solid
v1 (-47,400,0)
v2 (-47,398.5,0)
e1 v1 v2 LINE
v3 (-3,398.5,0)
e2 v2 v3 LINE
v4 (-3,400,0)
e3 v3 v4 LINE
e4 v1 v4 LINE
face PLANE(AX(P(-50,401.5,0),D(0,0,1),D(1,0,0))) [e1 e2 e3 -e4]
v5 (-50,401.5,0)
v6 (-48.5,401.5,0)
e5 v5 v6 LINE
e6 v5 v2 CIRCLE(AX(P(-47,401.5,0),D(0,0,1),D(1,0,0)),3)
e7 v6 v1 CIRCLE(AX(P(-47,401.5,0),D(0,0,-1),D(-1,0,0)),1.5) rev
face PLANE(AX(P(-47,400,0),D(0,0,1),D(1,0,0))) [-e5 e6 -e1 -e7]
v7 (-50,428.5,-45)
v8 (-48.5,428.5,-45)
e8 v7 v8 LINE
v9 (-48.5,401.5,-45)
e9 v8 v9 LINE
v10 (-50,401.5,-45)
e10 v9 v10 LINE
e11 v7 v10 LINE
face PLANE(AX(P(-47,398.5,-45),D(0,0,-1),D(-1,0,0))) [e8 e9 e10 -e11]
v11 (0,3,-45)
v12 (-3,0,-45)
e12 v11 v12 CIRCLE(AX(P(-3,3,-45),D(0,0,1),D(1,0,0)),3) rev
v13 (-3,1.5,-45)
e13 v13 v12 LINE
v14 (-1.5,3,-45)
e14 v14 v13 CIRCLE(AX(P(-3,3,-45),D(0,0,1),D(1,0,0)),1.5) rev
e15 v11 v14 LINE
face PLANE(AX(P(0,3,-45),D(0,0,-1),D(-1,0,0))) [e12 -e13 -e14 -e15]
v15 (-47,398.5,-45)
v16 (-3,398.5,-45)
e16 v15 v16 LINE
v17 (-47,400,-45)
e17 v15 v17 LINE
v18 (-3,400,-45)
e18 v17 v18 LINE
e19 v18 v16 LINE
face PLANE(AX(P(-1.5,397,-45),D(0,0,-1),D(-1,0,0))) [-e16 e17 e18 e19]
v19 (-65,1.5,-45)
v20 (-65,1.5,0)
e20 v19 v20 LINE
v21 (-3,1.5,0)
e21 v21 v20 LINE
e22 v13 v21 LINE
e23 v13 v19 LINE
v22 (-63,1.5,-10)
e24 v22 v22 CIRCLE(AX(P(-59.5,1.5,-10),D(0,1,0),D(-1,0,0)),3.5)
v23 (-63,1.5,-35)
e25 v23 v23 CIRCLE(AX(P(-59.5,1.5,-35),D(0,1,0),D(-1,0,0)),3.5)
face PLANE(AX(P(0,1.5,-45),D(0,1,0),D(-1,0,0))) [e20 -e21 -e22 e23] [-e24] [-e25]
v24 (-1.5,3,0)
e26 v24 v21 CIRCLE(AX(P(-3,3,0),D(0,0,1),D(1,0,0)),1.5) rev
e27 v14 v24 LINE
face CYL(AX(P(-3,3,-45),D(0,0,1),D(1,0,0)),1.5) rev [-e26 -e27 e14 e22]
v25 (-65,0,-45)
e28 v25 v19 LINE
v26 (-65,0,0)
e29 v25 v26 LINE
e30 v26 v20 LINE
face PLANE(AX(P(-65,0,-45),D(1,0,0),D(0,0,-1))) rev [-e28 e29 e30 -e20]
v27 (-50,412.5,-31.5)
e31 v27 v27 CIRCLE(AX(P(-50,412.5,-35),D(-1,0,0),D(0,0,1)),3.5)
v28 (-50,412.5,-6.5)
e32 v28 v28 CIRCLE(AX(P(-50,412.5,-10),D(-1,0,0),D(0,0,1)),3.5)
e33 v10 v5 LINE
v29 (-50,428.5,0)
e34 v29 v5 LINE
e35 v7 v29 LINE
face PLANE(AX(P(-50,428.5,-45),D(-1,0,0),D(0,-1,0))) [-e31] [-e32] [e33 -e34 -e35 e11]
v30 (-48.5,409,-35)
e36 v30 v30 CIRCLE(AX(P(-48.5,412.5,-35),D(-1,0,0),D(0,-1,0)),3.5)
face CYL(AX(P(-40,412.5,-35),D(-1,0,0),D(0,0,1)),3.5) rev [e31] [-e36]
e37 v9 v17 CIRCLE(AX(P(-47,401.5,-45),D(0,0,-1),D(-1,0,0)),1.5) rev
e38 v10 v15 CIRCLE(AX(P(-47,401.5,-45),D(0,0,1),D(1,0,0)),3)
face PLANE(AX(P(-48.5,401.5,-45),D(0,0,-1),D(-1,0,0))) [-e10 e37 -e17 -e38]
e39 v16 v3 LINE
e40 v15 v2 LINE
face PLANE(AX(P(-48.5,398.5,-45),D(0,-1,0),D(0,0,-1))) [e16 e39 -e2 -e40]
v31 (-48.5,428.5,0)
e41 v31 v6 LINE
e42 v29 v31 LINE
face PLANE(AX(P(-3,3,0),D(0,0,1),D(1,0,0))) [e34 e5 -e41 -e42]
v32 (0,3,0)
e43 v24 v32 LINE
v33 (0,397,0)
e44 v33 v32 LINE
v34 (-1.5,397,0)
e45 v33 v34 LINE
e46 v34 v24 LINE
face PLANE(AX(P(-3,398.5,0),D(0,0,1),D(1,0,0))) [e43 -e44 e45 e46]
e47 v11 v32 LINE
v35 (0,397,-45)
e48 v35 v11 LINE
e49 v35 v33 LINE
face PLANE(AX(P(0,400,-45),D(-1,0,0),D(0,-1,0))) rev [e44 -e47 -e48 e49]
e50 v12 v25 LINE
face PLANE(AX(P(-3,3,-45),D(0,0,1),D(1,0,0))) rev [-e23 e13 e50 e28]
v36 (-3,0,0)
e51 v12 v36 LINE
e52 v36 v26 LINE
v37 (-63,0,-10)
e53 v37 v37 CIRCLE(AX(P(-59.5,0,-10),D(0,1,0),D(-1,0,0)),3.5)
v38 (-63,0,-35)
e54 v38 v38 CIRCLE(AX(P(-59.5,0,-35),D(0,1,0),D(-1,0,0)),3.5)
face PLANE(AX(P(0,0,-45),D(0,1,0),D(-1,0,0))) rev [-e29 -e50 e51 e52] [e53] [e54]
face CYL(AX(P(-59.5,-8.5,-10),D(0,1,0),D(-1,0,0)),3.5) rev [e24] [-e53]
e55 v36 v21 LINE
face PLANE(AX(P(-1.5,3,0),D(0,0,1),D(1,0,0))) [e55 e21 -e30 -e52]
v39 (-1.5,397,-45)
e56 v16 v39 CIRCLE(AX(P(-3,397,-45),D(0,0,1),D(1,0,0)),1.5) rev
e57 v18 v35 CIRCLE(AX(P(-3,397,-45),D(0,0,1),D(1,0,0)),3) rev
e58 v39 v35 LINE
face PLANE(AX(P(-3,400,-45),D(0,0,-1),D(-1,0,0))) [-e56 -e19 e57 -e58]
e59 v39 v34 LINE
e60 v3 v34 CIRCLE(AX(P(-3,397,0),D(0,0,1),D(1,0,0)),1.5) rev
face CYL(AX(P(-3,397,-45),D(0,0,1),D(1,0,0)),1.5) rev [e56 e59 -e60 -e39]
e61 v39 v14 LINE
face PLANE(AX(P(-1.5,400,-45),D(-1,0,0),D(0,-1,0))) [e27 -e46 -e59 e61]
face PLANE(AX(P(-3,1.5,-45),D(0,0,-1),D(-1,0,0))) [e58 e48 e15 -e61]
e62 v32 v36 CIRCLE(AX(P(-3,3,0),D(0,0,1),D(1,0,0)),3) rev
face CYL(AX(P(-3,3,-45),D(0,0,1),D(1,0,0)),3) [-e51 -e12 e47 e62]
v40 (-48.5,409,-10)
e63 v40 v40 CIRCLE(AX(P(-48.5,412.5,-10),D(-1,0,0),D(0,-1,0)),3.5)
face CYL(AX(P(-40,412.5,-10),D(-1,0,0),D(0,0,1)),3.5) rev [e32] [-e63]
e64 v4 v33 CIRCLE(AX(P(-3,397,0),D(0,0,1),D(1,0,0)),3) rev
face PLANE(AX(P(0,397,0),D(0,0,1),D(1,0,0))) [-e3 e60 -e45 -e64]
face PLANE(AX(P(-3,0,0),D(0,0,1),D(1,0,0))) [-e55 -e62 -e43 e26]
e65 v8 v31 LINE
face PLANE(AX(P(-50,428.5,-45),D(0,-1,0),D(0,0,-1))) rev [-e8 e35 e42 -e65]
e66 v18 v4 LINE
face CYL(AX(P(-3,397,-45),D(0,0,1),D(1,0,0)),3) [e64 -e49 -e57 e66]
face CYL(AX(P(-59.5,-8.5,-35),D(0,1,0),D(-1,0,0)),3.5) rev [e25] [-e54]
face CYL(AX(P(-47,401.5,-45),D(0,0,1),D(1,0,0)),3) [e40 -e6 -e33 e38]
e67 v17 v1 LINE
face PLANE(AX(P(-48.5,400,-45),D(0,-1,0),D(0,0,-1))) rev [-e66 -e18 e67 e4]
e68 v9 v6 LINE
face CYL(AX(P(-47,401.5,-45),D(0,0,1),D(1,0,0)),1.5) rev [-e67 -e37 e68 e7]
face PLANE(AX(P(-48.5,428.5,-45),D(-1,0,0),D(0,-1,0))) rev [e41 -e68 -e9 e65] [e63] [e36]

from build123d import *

# Parameters (mm, degrees)
SM_BASE_FLANGE_1_DEPTH = 45
SKETCH_6_R             = 3.5
CUT_EXTRUDE_1_DEPTH    = 10
SKETCH_7_R             = 3.5
CUT_EXTRUDE_2_DEPTH    = 10


# Sheet-metal steps are written as plain solids
with BuildPart() as part:
    # Sketch 1 → Базовая кромка1 (new body)
    with BuildSketch(Plane.XY):
        with BuildLine():
            Line((-48.5, 428.5), (-48.5, 401.5))
            ThreePointArc((-48.5, 401.5), (-48.060660172, 400.439339828), (-47, 400))
            Line((-47, 400), (-3, 400))
            ThreePointArc((-3, 400), (-0.878679656, 399.121320344), (0, 397))
            Line((0, 397), (0, 3))
            ThreePointArc((0, 3), (-0.878679656, 0.878679656), (-3, 0))
            Line((-3, 0), (-65, 0))
            Line((-65, 0), (-65, 1.5))
            Line((-65, 1.5), (-3, 1.5))
            ThreePointArc((-3, 1.5), (-1.939339828, 1.939339828), (-1.5, 3))
            Line((-1.5, 3), (-1.5, 397))
            ThreePointArc((-1.5, 397), (-1.939339828, 398.060660172), (-3, 398.5))
            Line((-3, 398.5), (-47, 398.5))
            ThreePointArc((-47, 398.5), (-49.121320344, 399.378679656), (-50, 401.5))
            Line((-50, 401.5), (-50, 428.5))
            Line((-50, 428.5), (-48.5, 428.5))
        make_face()
    extrude(amount=-SM_BASE_FLANGE_1_DEPTH)

    # Эскиз6 → Вырез-Вытянуть1 (cut)
    with BuildSketch(Plane(origin=(0, 1.5, 0), x_dir=(1, 0, 0), z_dir=(0, 1, 0))):
        with Locations(Location((-59.5, 35, 0), (0, 0, 180))):
            Circle(SKETCH_6_R)
        with Locations(Location((-59.5, 10, 0), (0, 0, 180))):
            Circle(SKETCH_6_R)
    extrude(amount=-CUT_EXTRUDE_1_DEPTH, mode=Mode.SUBTRACT)

    # Эскиз7 → Вырез-Вытянуть2 (cut)
    with BuildSketch(Plane.ZY.offset(50)):
        with Locations((-35, 412.5)):
            Circle(SKETCH_7_R)
        with Locations((-10, 412.5)):
            Circle(SKETCH_7_R)
    extrude(amount=-CUT_EXTRUDE_2_DEPTH, mode=Mode.SUBTRACT)


solid = part.part
